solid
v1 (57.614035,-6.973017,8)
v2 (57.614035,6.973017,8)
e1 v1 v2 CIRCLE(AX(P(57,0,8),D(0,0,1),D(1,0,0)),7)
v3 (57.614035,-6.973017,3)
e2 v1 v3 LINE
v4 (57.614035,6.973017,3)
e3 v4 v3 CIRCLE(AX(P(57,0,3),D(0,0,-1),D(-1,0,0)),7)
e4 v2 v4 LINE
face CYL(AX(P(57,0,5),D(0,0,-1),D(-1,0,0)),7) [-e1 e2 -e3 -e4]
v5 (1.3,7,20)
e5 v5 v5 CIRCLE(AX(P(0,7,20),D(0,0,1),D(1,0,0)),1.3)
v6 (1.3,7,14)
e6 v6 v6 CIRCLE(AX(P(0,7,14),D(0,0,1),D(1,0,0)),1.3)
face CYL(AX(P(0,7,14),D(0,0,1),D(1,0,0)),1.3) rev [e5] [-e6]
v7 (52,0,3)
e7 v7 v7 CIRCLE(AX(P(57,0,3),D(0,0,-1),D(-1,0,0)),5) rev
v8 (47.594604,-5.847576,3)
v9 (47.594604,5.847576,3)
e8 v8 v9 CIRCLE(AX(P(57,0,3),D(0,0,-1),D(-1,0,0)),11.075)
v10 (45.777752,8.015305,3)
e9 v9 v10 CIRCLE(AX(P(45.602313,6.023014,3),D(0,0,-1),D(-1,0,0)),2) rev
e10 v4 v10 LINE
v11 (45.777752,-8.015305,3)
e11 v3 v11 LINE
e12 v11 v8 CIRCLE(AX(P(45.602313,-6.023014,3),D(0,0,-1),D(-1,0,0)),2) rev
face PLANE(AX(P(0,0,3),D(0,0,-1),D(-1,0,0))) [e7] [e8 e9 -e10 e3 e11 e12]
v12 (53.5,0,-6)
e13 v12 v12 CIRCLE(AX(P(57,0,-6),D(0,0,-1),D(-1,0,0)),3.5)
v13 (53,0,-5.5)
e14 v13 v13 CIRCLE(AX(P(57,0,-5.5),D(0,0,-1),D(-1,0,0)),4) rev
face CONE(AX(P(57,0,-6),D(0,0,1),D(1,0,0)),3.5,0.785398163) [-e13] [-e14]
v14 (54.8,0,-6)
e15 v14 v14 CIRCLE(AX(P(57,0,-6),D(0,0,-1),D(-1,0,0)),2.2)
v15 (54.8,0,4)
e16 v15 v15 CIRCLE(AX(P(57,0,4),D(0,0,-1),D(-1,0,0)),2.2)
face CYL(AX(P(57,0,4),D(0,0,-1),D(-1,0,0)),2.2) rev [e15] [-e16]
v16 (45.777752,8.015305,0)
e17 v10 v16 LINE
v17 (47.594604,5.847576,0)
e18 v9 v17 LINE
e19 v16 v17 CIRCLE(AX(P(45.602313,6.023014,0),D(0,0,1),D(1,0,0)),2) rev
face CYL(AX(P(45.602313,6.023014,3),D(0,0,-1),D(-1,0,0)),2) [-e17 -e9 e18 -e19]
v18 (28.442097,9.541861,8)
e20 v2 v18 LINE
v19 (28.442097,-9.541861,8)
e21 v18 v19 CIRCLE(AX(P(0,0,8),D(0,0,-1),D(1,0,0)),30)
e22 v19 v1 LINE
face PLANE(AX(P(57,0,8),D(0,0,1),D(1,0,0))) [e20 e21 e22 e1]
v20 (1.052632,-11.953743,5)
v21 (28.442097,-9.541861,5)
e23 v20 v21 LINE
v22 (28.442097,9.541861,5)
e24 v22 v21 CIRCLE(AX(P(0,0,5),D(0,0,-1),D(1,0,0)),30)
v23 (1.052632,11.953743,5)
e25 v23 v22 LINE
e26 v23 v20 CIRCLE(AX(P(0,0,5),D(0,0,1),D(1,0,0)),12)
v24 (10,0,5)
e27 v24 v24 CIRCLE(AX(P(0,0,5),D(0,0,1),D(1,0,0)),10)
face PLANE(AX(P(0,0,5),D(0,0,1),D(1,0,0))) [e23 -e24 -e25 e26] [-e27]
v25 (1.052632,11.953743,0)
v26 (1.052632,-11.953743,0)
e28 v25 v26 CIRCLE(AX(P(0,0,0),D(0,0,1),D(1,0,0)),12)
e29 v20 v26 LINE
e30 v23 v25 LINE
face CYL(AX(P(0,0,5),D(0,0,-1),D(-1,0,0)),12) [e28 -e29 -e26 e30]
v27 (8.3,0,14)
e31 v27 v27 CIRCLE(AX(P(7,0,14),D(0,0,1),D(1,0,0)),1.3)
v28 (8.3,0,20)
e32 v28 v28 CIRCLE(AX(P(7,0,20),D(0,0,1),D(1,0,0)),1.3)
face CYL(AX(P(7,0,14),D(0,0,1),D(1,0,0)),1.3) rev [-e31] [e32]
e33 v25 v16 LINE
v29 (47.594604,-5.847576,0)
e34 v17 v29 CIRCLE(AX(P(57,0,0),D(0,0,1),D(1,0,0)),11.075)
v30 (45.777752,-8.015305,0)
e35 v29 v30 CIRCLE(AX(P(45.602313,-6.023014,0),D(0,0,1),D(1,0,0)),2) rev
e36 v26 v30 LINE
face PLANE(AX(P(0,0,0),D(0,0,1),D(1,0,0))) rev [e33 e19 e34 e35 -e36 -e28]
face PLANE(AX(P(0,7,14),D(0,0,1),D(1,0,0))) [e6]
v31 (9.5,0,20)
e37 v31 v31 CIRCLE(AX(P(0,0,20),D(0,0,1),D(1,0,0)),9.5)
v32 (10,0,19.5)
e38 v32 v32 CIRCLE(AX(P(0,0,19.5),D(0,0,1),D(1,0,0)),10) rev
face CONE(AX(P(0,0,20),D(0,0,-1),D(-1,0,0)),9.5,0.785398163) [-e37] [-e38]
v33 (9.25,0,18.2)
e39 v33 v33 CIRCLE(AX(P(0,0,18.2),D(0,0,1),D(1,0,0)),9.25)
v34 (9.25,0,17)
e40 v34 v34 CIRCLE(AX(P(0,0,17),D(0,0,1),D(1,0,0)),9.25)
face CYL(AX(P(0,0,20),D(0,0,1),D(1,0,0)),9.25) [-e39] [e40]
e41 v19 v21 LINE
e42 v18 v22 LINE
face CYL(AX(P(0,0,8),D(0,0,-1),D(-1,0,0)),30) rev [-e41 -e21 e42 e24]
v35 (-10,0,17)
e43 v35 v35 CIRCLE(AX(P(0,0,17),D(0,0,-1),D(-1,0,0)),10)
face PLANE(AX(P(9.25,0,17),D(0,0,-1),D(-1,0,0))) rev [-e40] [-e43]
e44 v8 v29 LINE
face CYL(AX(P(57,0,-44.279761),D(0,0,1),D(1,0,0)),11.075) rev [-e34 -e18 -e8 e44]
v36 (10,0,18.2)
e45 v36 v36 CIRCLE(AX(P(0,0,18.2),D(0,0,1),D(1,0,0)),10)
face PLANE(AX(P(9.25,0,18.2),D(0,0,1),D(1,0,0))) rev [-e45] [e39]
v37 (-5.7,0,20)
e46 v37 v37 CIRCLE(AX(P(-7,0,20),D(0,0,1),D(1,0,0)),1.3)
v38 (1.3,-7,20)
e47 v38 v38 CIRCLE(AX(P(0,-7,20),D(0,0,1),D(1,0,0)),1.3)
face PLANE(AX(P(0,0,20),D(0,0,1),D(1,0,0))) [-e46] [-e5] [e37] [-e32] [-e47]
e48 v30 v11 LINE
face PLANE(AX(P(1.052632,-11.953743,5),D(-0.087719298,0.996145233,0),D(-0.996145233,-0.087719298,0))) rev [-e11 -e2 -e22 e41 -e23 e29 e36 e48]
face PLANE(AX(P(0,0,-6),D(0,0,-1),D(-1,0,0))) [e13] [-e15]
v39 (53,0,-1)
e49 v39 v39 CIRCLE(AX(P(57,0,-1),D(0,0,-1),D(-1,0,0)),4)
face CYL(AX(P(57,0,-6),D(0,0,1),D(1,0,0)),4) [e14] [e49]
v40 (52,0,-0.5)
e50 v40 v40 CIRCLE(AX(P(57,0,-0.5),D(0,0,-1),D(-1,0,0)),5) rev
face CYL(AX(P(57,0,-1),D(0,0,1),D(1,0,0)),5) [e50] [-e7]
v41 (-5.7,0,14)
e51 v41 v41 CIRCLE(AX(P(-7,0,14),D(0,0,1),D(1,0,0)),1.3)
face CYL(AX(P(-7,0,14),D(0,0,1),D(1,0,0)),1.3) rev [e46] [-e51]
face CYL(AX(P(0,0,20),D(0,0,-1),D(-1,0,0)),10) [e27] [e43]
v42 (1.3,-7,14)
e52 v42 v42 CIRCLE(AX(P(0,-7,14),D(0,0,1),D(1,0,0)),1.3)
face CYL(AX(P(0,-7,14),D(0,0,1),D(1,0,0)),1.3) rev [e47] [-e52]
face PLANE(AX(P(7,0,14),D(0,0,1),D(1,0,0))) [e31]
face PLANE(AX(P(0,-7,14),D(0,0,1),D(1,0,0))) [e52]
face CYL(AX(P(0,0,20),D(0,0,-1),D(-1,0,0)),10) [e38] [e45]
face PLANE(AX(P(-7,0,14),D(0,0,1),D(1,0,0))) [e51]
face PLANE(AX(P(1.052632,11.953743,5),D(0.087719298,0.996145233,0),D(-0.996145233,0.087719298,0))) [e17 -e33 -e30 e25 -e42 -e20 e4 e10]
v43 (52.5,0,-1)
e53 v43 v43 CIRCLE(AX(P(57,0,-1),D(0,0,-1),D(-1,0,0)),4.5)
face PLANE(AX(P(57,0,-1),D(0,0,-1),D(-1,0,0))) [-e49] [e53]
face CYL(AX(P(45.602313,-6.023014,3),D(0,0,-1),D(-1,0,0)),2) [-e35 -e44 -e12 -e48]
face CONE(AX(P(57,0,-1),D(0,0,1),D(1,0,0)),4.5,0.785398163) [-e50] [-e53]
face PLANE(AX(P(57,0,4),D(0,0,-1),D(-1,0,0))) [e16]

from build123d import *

# Parameters (mm, degrees)
EXTRUDE_1_DEPTH     = 5
SKETCH_2_R          = 10
EXTRUDE_2_DEPTH     = 15
SKETCH_3_R          = 4
EXTRUDE_3_DEPTH     = 6
SKETCH_4_R          = 5
SKETCH_4_R_2        = 4
EXTRUDE_4_DEPTH     = 1
CHAMFER_1_SIZE      = 0.5
SKETCH_6_R          = 1.3
CUT_EXTRUDE_2_DEPTH = 6
SKETCH_11_R         = 2.2
CUT_EXTRUDE_7_DEPTH = 10
CUT_EXTRUDE_START   = -5
CUT_EXTRUDE_8_DEPTH = 5
CUT_EXTRUDE_START_2 = -3
SKETCH_14_R         = 11.075
SKETCH_14_R_2       = 5
CUT_EXTRUDE_9_DEPTH = 3
EXTRUDE_START       = -1
EXTRUDE_5_DEPTH     = 1
FILLET_1_R          = 2
SKETCH_16_W         = 4.663078912
SKETCH_16_H         = 1.2
EXTRUDE_6_DEPTH     = 4
EXTRUDE_7_DEPTH     = 1
EXTRUDE_8_DEPTH     = 3


with BuildPart() as part:
    # 草图1 → 凸台-拉伸1 (new body)
    with BuildSketch(Plane.XY):
        with BuildLine():
            Line((57.614035088, 6.973016629), (1.052631579, 11.953742793))
            ThreePointArc((1.052631579, 11.953742793), (-12, 0), (1.052631579, -11.953742793))
            Line((1.052631579, -11.953742793), (57.614035088, -6.973016629))
            ThreePointArc((57.614035088, -6.973016629), (64, 0), (57.614035088, 6.973016629))
        make_face()
    extrude(amount=EXTRUDE_1_DEPTH)

    # 草图2 → 凸台-拉伸2 (add)
    with BuildSketch(Plane.XY.offset(5)):
        Circle(SKETCH_2_R)
    extrude(amount=EXTRUDE_2_DEPTH)

    # 草图3 → 凸台-拉伸3 (add)
    with BuildSketch(Plane(origin=(0, 0, 0), x_dir=(-1, 0, 0), z_dir=(0, 0, -1))):
        with Locations((-57, 0)):
            Circle(SKETCH_3_R)
    extrude(amount=EXTRUDE_3_DEPTH)

    # 草图4 → 凸台-拉伸4 (add)
    with BuildSketch(Plane(origin=(0, 0, 0), x_dir=(-1, 0, 0), z_dir=(0, 0, -1))):
        with Locations(Location((-57, 0, 0), (0, 0, 180))):
            Circle(SKETCH_4_R)
        with Locations((-57, 0)):
            Circle(SKETCH_4_R_2, mode=Mode.SUBTRACT)
    extrude(amount=EXTRUDE_4_DEPTH)

    # 倒角1
    chamfer_1_edges = [part.edges().sort_by_distance(p)[0] for p in [
        (-10, 0, 20),
        (61, 0, -6),
        (52, 0, -1),
    ]]
    chamfer(chamfer_1_edges, length=CHAMFER_1_SIZE)

    # 草图6 → 切除-拉伸2 (cut)
    with BuildSketch(Plane.XY.offset(20)):
        with Locations((0, 7)):
            Circle(SKETCH_6_R)
        with Locations((7, 0)):
            Circle(SKETCH_6_R)
        with Locations((0, -7)):
            Circle(SKETCH_6_R)
        with Locations((-7, 0)):
            Circle(SKETCH_6_R)
    extrude(amount=-CUT_EXTRUDE_2_DEPTH, mode=Mode.SUBTRACT)

    # 草图11 → 切除-拉伸7 (cut)
    with BuildSketch(Plane(origin=(0, 0, -6), x_dir=(-1, 0, 0), z_dir=(0, 0, -1))):
        with Locations((-57, 0)):
            Circle(SKETCH_11_R)
    extrude(amount=-CUT_EXTRUDE_7_DEPTH, mode=Mode.SUBTRACT)

    # 草图12 → 切除-拉伸8 (cut)
    with BuildSketch(Plane.XY.offset(5).offset(CUT_EXTRUDE_START)):
        with BuildLine():
            Line((57.438596491, 4.980726164), (7.48487293, 9.379588329))
            ThreePointArc((7.48487293, 9.379588329), (10.812457518, 5.204878713), (12, 0))
            ThreePointArc((12, 0), (10.812457518, -5.204878713), (7.48487293, -9.379588329))
            Line((7.48487293, -9.379588329), (57.438596491, -4.980726164))
            ThreePointArc((57.438596491, -4.980726164), (52, 0), (57.438596491, 4.980726164))
        make_face()
    extrude(amount=CUT_EXTRUDE_8_DEPTH, mode=Mode.SUBTRACT)

    # 草图14 → 切除-拉伸9 (cut)
    with BuildSketch(Plane(origin=(0, 0, 0), x_dir=(-1, 0, 0), z_dir=(0, 0, -1)).offset(CUT_EXTRUDE_START_2)):
        with Locations((-57, 0)):
            Circle(SKETCH_14_R)
        with Locations(Location((-57, 0, 0), (0, 0, 95.032413496))):
            Circle(SKETCH_14_R_2, mode=Mode.SUBTRACT)
    extrude(amount=CUT_EXTRUDE_9_DEPTH, mode=Mode.SUBTRACT)

    # 草图15 → 凸台-拉伸5 (add)
    with BuildSketch(Plane.XY.offset(5).offset(EXTRUDE_START)):
        with BuildLine():
            Line((1.052631579, -11.953742793), (57.614035088, -6.973016629))
            ThreePointArc((57.614035088, -6.973016629), (64, 0), (57.614035088, 6.973016629))
            Line((57.614035088, 6.973016629), (1.052631579, 11.953742793))
            ThreePointArc((1.052631579, 11.953742793), (-12, 0), (1.052631579, -11.953742793))
        make_face()
    extrude(amount=EXTRUDE_5_DEPTH)

    # 圆角1
    # the kernel refuses this fillet: 2 mm, written as the material it takes off along each edge
    with BuildSketch(Plane(origin=(49.064832266, -7.725848694, -8.249501326), x_dir=(-0.6163800221199659, 0.7874488353736963, 0), z_dir=(0, 0, 1))) as fillet_1_piece_1:
        with BuildLine():
            CenterArc((3.475122508, 1.676963653), FILLET_1_R, 146.980149767, 90)
            Line((1.798158856, 2.766822775), (0, 0))
            ThreePointArc((0, 0), (1.192631693, 0.064402621), (2.385263386, 0))
        make_face()
    extrude(amount=11.249501326, mode=Mode.SUBTRACT)
    with BuildSketch(Plane(origin=(49.064832266, 7.725848694, -8.249501326), x_dir=(-0.9961452327423431, 0.08771929824561424, 0), z_dir=(0, 0, 1))) as fillet_1_piece_2:
        with BuildLine():
            CenterArc((3.29980053, 2), FILLET_1_R, 180, 90)
            ThreePointArc((1.29980053, 2), (0.703900692, 0.964905108), (0, 0))
            Line((0, 0), (3.29980053, 0))
        make_face()
    extrude(amount=11.249501326, mode=Mode.SUBTRACT)

    # 草图16 → 切除-旋转1 (revolve, cut)
    with BuildSketch(Plane(origin=(0, 0, 0), x_dir=(1, 0, 0), z_dir=(0, 1, 0))):
        with Locations((11.581539456, -17.6)):
            Rectangle(SKETCH_16_W, SKETCH_16_H)
    revolve(axis=Axis((0, 0, 20), (0, 0, -1)), mode=Mode.SUBTRACT)

    # 草图17 → 凸台-拉伸6 (add)
    # profile 1 of 2: a face of its own
    with BuildSketch(Plane(origin=(0, 0, 4), x_dir=(-1, 0, 0), z_dir=(0, 0, -1))):
        with BuildLine():
            ThreePointArc((-7.48487293, -9.379588329), (-12, 0), (-7.48487293, 9.379588329))
            Line((-7.48487293, 9.379588329), (-47.594603568, 5.847575819))
            ThreePointArc((-47.594603568, 5.847575819), (-45.925, 0), (-47.594603568, -5.847575819))
            Line((-47.594603568, -5.847575819), (-7.48487293, -9.379588329))
        make_face()
        with BuildLine():
            Line((-43.563456974, -2.155807668), (-43.563456974, 2.155807668))
            Line((-43.563456974, 2.155807668), (-15.344753505, 4.640711258))
            ThreePointArc((-15.344753505, 4.640711258), (-16.031146594, 0), (-15.344753505, -4.640711258))
            Line((-15.344753505, -4.640711258), (-43.563456974, -2.155807668))
        make_face(mode=Mode.SUBTRACT)
    # profile 2 of 2: a face of its own
    with BuildSketch(Plane(origin=(0, 0, 4), x_dir=(-1, 0, 0), z_dir=(0, 0, -1))):
        with BuildLine():
            ThreePointArc((-15.344753505, 4.640711258), (-16.031146594, 0), (-15.344753505, -4.640711258))
            Line((-15.344753505, -4.640711258), (-43.563456974, -2.155807668))
            Line((-43.563456974, -2.155807668), (-43.563456974, 2.155807668))
            Line((-43.563456974, 2.155807668), (-15.344753505, 4.640711258))
        make_face()
    extrude(amount=EXTRUDE_6_DEPTH)

    # 草图18 → 凸台-拉伸7 (add)
    with BuildSketch(Plane(origin=(0, 0, 4), x_dir=(-1, 0, 0), z_dir=(0, 0, -1))):
        with BuildLine():
            Line((-47.594603568, 5.847575819), (-57.438596491, 4.980726164))
            ThreePointArc((-57.438596491, 4.980726164), (-52, 0), (-57.438596491, -4.980726164))
            Line((-57.438596491, -4.980726164), (-47.594603568, -5.847575819))
            ThreePointArc((-47.594603568, -5.847575819), (-45.925, 0), (-47.594603568, 5.847575819))
        make_face()
    extrude(amount=EXTRUDE_7_DEPTH)

    # 草图19 → 凸台-拉伸8 (add)
    with BuildSketch(Plane.XY.offset(5)):
        with BuildLine():
            Line((28.442097172, -9.541860848), (57.614035088, -6.973016629))
            ThreePointArc((57.614035088, -6.973016629), (64, 0), (57.614035088, 6.973016629))
            Line((57.614035088, 6.973016629), (28.442097172, 9.541860848))
            ThreePointArc((28.442097172, 9.541860848), (30, 0), (28.442097172, -9.541860848))
        make_face()
    extrude(amount=EXTRUDE_8_DEPTH)


solid = part.part
